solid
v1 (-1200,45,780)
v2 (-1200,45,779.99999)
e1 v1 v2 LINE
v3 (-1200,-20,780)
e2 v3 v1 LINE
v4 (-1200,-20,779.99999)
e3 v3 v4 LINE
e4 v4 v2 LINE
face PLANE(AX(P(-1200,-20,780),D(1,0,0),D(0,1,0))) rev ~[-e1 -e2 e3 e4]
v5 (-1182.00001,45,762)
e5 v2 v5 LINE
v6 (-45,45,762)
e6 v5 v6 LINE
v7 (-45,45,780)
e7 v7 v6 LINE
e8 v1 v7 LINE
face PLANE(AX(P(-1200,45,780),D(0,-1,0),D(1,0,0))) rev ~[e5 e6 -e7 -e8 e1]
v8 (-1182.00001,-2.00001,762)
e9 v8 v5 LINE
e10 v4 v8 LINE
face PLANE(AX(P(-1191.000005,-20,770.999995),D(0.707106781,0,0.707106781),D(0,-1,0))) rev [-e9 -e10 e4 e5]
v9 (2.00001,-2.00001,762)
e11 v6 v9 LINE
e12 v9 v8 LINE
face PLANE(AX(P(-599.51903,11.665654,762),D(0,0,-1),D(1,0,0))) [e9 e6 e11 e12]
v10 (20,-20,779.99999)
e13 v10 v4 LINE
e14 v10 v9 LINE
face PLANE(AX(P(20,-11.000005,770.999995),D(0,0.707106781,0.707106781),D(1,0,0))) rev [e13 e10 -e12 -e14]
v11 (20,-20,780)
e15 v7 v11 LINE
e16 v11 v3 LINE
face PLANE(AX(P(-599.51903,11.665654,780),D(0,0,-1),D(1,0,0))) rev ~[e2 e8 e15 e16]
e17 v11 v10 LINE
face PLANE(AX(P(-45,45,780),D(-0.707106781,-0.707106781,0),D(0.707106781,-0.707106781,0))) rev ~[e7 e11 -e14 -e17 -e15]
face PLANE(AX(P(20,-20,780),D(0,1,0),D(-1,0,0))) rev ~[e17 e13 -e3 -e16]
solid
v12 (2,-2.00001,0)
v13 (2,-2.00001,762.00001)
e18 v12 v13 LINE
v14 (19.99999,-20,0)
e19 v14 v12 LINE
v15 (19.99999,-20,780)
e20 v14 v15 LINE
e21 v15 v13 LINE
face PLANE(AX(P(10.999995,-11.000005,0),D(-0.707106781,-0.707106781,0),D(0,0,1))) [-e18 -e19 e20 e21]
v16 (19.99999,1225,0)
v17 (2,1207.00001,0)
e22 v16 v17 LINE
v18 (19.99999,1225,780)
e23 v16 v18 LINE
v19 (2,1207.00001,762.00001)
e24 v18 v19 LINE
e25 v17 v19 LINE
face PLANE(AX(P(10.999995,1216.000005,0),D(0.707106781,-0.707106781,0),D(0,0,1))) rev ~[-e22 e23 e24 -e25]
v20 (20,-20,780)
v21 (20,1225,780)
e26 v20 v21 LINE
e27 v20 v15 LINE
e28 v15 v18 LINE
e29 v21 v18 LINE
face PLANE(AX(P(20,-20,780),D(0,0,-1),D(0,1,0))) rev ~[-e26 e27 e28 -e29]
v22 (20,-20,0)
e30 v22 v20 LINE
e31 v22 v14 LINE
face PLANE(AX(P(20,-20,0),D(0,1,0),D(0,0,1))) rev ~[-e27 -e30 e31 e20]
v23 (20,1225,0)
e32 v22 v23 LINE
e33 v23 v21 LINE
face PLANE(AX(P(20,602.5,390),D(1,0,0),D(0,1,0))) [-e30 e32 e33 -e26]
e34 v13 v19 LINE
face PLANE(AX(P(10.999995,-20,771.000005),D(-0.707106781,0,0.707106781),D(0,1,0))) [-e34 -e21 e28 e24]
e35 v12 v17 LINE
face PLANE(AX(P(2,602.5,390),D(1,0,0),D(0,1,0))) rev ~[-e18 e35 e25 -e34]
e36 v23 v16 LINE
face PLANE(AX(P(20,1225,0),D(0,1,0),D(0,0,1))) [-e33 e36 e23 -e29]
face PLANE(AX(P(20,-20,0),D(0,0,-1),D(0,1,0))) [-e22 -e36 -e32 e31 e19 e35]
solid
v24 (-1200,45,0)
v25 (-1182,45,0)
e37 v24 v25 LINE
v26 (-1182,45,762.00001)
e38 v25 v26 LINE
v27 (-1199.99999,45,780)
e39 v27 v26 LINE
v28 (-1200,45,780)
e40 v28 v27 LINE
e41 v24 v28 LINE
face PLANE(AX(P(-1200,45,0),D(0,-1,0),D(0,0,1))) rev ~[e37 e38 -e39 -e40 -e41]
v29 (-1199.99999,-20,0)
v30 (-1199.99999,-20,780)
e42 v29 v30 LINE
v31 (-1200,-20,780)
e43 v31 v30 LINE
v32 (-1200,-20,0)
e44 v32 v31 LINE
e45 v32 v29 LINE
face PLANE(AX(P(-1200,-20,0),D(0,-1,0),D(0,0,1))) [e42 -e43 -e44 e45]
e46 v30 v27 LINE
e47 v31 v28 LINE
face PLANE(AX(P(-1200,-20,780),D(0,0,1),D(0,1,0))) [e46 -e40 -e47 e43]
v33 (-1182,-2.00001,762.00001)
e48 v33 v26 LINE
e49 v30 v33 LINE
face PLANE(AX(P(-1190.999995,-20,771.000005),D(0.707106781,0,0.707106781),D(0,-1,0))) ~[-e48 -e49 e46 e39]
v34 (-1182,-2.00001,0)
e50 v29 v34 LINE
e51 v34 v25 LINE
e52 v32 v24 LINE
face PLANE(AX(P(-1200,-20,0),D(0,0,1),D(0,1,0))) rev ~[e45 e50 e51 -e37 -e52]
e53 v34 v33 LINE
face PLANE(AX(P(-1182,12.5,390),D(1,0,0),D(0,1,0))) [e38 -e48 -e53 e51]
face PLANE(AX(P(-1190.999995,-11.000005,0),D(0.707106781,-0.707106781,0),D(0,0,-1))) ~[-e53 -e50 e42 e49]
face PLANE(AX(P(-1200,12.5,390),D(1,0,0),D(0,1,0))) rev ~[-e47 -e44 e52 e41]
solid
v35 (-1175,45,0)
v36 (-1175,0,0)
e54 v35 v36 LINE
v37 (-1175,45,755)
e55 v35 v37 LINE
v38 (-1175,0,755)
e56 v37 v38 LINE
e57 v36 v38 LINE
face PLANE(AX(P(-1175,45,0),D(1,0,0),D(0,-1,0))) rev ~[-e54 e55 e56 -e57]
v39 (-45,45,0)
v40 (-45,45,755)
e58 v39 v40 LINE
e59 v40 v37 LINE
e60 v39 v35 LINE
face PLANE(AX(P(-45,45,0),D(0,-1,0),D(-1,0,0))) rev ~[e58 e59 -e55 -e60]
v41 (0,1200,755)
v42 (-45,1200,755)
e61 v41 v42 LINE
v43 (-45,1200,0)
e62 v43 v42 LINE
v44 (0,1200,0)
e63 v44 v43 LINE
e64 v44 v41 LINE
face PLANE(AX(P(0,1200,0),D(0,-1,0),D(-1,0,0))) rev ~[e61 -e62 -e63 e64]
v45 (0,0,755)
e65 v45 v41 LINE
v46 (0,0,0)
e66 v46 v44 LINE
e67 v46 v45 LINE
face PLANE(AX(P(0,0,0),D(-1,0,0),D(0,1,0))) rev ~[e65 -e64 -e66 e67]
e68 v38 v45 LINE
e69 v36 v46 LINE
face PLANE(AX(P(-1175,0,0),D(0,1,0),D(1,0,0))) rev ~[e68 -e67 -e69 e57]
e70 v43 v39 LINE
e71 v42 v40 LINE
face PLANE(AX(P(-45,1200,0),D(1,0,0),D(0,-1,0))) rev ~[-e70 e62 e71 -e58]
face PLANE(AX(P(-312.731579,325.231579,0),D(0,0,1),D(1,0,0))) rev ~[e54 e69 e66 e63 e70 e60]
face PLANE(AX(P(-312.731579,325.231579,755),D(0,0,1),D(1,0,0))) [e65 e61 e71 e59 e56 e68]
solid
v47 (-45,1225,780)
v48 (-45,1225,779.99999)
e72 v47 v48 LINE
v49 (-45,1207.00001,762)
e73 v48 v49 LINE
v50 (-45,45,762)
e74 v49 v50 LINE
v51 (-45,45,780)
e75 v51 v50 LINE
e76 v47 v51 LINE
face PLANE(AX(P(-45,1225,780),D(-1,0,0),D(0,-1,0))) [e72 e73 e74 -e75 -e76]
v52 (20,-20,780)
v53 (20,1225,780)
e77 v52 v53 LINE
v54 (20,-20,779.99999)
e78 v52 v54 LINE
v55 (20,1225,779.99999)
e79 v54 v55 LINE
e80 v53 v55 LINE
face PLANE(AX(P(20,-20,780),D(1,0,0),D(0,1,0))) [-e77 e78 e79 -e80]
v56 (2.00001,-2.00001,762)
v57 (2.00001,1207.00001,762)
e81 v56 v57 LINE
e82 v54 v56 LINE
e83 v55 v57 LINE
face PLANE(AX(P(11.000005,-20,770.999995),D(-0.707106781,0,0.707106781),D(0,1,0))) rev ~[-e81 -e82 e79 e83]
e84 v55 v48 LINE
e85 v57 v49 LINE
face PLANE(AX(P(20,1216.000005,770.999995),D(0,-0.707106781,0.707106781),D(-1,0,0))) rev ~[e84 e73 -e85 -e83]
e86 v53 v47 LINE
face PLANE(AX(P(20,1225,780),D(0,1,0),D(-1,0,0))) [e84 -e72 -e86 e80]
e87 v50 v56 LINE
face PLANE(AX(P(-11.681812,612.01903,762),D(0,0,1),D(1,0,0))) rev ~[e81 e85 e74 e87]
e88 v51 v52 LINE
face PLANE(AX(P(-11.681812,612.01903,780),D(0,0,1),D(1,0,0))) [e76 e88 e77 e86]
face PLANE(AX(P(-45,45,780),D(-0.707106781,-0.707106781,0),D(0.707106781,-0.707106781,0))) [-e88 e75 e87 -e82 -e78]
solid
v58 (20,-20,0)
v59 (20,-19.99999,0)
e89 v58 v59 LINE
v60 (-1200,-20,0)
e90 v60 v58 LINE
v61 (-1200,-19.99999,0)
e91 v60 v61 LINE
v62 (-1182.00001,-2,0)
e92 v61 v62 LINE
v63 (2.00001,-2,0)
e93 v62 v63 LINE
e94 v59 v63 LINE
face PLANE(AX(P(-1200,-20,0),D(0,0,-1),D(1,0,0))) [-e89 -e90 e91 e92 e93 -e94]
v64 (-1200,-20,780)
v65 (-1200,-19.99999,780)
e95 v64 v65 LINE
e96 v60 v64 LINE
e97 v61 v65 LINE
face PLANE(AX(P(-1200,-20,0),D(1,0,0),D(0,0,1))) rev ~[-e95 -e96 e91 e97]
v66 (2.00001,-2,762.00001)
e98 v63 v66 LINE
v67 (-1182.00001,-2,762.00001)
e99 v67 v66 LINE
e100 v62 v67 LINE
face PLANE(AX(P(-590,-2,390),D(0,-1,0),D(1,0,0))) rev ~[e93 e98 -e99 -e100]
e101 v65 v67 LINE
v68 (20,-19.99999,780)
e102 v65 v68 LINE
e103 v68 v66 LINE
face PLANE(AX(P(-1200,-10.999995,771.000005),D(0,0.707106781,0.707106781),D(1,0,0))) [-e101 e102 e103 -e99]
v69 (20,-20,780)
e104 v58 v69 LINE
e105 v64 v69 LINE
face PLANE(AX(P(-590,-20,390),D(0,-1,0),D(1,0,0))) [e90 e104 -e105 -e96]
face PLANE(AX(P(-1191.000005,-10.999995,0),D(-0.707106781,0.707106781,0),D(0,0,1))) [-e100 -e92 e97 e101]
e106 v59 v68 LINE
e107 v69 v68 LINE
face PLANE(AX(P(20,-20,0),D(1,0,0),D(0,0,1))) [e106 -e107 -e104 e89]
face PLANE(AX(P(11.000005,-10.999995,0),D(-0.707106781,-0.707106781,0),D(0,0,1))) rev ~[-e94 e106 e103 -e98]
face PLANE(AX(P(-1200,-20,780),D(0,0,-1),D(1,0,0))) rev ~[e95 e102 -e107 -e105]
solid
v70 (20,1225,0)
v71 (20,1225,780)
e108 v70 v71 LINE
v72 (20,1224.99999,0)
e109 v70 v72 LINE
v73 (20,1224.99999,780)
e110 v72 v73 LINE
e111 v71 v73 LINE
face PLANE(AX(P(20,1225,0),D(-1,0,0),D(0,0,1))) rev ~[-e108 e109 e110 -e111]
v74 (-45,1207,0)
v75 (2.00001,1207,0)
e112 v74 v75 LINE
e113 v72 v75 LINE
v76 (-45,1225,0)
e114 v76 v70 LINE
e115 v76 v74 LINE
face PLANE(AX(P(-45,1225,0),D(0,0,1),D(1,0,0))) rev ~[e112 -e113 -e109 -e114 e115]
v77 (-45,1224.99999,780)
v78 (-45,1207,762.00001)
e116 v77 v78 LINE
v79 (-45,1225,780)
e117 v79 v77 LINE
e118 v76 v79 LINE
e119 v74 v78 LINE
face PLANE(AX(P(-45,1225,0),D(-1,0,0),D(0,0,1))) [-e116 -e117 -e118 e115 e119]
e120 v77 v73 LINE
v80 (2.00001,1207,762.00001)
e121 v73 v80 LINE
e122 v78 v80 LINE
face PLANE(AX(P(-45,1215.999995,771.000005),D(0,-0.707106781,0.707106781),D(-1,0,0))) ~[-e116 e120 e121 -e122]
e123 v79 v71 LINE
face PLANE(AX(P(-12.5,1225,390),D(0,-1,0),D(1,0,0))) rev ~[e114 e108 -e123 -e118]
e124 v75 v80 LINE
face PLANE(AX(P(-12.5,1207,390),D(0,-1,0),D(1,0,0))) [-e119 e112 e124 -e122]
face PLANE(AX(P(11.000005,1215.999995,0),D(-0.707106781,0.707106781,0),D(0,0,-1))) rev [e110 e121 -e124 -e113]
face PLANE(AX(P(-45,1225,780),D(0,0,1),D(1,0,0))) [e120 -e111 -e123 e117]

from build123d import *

# Parameters (mm, degrees)
F1_DEPTH   = 755
F3_W       = 1220
F3_H       = 780
F4_DEPTH   = 18
F5_SIZE    = 17.99999
F7_W       = 1245
F7_H       = 780
F8_DEPTH   = 18
F9_SIZE    = 17.99999
F11_W      = 65
F11_H      = 780
F12_DEPTH  = 18
F13_SIZE   = 17.99999
F15_W      = 65
F15_H      = 780
F16_DEPTH  = 18
F17_SIZE   = 17.99999
F22_DEPTH  = 18
F23_DEPTH  = 18
F24_SIZE   = 17.99999
F24_2_SIZE = 17.99999


# Not quite as in the source:
# - a fillet or chamfer is up to 0.001 mm smaller than in the source, because OpenCascade refuses the exact size


with BuildPart() as f1:
    # F0 (on Top) → F1 (new body)
    with BuildSketch(Plane.XY):
        Polygon((-1175, 45), (-1175, 0), (0, 0), (0, 1200), (-45, 1200), (-45, 45), align=None)
    extrude(amount=F1_DEPTH)


with BuildPart() as f4:
    # F3 (on offset) → F4 (new body)
    with BuildSketch(Plane.XZ.offset(20)):
        with Locations((-590, 390)):
            Rectangle(F3_W, F3_H)
    extrude(amount=-F4_DEPTH)

    # F5 (size 18 in the source; OpenCascade refuses exactly that, so slightly less here)
    f5_edges = [f4.edges().sort_by_distance(p)[0] for p in [
        (20, -2, 390),
        (-590, -2, 780),
        (-1200, -2, 390),
    ]]
    chamfer(f5_edges, length=F5_SIZE)


with BuildPart() as f8:
    # F7 (on offset) → F8 (new body)
    with BuildSketch(Plane.YZ.offset(20)):
        with Locations((602.5, 390)):
            Rectangle(F7_W, F7_H)
    extrude(amount=-F8_DEPTH)

    # F9 (size 18 in the source; OpenCascade refuses exactly that, so slightly less here)
    f9_edges = [f8.edges().sort_by_distance(p)[0] for p in [
        (2, -20, 390),
        (2, 602.5, 780),
        (2, 1225, 390),
    ]]
    chamfer(f9_edges, length=F9_SIZE)


with BuildPart() as f12:
    # F11 (on face) → F12 (new body)
    with BuildSketch(Plane.YZ.offset(-1200)):
        with Locations((12.5, 390)):
            Rectangle(F11_W, F11_H)
    extrude(amount=F12_DEPTH)

    # F13 (size 18 in the source; OpenCascade refuses exactly that, so slightly less here)
    f13_edges = [f12.edges().sort_by_distance(p)[0] for p in [
        (-1182, 12.5, 780),
        (-1182, -20, 390),
    ]]
    chamfer(f13_edges, length=F13_SIZE)


with BuildPart() as f16:
    # F15 (on face) → F16 (new body)
    with BuildSketch(Plane.XZ.offset(-1225)):
        with Locations((-12.5, 390)):
            Rectangle(F15_W, F15_H)
    extrude(amount=F16_DEPTH)

    # F17 (size 18 in the source; OpenCascade refuses exactly that, so slightly less here)
    f17_edges = [f16.edges().sort_by_distance(p)[0] for p in [
        (20, 1207, 390),
        (-12.5, 1207, 780),
    ]]
    chamfer(f17_edges, length=F17_SIZE)


with BuildPart() as f22:
    # F21 (on face) → F22 (new body)
    with BuildSketch(Plane(origin=(0, 0, 780), x_dir=(1, 0, 0), z_dir=(0, 0, -1))):
        Polygon((-1200, 20), (-1200, -45), (-45, -45), (20, 20), align=None)
    extrude(amount=F22_DEPTH)

    # F24 (size 18 in the source; OpenCascade refuses exactly that, so slightly less here)
    f24_edges = [f22.edges().sort_by_distance(p)[0] for p in [
        (-1200, 12.5, 762),
        (-590, -20, 762),
    ]]
    chamfer(f24_edges, length=F24_SIZE)


with BuildPart() as f23:
    # F19 (on face) → F23 (new body)
    with BuildSketch(Plane.XY.offset(780)):
        Polygon((-45, 45), (20, -20), (20, 1225), (-45, 1225), align=None)
    extrude(amount=-F23_DEPTH)

    # F24#2 (size 18 in the source; OpenCascade refuses exactly that, so slightly less here)
    f24_2_edges = [f23.edges().sort_by_distance(p)[0] for p in [
        (20, 602.5, 762),
        (-12.5, 1225, 762),
    ]]
    chamfer(f24_2_edges, length=F24_2_SIZE)


solid = Compound([f1.part, f4.part, f8.part, f12.part, f16.part, f22.part, f23.part])
